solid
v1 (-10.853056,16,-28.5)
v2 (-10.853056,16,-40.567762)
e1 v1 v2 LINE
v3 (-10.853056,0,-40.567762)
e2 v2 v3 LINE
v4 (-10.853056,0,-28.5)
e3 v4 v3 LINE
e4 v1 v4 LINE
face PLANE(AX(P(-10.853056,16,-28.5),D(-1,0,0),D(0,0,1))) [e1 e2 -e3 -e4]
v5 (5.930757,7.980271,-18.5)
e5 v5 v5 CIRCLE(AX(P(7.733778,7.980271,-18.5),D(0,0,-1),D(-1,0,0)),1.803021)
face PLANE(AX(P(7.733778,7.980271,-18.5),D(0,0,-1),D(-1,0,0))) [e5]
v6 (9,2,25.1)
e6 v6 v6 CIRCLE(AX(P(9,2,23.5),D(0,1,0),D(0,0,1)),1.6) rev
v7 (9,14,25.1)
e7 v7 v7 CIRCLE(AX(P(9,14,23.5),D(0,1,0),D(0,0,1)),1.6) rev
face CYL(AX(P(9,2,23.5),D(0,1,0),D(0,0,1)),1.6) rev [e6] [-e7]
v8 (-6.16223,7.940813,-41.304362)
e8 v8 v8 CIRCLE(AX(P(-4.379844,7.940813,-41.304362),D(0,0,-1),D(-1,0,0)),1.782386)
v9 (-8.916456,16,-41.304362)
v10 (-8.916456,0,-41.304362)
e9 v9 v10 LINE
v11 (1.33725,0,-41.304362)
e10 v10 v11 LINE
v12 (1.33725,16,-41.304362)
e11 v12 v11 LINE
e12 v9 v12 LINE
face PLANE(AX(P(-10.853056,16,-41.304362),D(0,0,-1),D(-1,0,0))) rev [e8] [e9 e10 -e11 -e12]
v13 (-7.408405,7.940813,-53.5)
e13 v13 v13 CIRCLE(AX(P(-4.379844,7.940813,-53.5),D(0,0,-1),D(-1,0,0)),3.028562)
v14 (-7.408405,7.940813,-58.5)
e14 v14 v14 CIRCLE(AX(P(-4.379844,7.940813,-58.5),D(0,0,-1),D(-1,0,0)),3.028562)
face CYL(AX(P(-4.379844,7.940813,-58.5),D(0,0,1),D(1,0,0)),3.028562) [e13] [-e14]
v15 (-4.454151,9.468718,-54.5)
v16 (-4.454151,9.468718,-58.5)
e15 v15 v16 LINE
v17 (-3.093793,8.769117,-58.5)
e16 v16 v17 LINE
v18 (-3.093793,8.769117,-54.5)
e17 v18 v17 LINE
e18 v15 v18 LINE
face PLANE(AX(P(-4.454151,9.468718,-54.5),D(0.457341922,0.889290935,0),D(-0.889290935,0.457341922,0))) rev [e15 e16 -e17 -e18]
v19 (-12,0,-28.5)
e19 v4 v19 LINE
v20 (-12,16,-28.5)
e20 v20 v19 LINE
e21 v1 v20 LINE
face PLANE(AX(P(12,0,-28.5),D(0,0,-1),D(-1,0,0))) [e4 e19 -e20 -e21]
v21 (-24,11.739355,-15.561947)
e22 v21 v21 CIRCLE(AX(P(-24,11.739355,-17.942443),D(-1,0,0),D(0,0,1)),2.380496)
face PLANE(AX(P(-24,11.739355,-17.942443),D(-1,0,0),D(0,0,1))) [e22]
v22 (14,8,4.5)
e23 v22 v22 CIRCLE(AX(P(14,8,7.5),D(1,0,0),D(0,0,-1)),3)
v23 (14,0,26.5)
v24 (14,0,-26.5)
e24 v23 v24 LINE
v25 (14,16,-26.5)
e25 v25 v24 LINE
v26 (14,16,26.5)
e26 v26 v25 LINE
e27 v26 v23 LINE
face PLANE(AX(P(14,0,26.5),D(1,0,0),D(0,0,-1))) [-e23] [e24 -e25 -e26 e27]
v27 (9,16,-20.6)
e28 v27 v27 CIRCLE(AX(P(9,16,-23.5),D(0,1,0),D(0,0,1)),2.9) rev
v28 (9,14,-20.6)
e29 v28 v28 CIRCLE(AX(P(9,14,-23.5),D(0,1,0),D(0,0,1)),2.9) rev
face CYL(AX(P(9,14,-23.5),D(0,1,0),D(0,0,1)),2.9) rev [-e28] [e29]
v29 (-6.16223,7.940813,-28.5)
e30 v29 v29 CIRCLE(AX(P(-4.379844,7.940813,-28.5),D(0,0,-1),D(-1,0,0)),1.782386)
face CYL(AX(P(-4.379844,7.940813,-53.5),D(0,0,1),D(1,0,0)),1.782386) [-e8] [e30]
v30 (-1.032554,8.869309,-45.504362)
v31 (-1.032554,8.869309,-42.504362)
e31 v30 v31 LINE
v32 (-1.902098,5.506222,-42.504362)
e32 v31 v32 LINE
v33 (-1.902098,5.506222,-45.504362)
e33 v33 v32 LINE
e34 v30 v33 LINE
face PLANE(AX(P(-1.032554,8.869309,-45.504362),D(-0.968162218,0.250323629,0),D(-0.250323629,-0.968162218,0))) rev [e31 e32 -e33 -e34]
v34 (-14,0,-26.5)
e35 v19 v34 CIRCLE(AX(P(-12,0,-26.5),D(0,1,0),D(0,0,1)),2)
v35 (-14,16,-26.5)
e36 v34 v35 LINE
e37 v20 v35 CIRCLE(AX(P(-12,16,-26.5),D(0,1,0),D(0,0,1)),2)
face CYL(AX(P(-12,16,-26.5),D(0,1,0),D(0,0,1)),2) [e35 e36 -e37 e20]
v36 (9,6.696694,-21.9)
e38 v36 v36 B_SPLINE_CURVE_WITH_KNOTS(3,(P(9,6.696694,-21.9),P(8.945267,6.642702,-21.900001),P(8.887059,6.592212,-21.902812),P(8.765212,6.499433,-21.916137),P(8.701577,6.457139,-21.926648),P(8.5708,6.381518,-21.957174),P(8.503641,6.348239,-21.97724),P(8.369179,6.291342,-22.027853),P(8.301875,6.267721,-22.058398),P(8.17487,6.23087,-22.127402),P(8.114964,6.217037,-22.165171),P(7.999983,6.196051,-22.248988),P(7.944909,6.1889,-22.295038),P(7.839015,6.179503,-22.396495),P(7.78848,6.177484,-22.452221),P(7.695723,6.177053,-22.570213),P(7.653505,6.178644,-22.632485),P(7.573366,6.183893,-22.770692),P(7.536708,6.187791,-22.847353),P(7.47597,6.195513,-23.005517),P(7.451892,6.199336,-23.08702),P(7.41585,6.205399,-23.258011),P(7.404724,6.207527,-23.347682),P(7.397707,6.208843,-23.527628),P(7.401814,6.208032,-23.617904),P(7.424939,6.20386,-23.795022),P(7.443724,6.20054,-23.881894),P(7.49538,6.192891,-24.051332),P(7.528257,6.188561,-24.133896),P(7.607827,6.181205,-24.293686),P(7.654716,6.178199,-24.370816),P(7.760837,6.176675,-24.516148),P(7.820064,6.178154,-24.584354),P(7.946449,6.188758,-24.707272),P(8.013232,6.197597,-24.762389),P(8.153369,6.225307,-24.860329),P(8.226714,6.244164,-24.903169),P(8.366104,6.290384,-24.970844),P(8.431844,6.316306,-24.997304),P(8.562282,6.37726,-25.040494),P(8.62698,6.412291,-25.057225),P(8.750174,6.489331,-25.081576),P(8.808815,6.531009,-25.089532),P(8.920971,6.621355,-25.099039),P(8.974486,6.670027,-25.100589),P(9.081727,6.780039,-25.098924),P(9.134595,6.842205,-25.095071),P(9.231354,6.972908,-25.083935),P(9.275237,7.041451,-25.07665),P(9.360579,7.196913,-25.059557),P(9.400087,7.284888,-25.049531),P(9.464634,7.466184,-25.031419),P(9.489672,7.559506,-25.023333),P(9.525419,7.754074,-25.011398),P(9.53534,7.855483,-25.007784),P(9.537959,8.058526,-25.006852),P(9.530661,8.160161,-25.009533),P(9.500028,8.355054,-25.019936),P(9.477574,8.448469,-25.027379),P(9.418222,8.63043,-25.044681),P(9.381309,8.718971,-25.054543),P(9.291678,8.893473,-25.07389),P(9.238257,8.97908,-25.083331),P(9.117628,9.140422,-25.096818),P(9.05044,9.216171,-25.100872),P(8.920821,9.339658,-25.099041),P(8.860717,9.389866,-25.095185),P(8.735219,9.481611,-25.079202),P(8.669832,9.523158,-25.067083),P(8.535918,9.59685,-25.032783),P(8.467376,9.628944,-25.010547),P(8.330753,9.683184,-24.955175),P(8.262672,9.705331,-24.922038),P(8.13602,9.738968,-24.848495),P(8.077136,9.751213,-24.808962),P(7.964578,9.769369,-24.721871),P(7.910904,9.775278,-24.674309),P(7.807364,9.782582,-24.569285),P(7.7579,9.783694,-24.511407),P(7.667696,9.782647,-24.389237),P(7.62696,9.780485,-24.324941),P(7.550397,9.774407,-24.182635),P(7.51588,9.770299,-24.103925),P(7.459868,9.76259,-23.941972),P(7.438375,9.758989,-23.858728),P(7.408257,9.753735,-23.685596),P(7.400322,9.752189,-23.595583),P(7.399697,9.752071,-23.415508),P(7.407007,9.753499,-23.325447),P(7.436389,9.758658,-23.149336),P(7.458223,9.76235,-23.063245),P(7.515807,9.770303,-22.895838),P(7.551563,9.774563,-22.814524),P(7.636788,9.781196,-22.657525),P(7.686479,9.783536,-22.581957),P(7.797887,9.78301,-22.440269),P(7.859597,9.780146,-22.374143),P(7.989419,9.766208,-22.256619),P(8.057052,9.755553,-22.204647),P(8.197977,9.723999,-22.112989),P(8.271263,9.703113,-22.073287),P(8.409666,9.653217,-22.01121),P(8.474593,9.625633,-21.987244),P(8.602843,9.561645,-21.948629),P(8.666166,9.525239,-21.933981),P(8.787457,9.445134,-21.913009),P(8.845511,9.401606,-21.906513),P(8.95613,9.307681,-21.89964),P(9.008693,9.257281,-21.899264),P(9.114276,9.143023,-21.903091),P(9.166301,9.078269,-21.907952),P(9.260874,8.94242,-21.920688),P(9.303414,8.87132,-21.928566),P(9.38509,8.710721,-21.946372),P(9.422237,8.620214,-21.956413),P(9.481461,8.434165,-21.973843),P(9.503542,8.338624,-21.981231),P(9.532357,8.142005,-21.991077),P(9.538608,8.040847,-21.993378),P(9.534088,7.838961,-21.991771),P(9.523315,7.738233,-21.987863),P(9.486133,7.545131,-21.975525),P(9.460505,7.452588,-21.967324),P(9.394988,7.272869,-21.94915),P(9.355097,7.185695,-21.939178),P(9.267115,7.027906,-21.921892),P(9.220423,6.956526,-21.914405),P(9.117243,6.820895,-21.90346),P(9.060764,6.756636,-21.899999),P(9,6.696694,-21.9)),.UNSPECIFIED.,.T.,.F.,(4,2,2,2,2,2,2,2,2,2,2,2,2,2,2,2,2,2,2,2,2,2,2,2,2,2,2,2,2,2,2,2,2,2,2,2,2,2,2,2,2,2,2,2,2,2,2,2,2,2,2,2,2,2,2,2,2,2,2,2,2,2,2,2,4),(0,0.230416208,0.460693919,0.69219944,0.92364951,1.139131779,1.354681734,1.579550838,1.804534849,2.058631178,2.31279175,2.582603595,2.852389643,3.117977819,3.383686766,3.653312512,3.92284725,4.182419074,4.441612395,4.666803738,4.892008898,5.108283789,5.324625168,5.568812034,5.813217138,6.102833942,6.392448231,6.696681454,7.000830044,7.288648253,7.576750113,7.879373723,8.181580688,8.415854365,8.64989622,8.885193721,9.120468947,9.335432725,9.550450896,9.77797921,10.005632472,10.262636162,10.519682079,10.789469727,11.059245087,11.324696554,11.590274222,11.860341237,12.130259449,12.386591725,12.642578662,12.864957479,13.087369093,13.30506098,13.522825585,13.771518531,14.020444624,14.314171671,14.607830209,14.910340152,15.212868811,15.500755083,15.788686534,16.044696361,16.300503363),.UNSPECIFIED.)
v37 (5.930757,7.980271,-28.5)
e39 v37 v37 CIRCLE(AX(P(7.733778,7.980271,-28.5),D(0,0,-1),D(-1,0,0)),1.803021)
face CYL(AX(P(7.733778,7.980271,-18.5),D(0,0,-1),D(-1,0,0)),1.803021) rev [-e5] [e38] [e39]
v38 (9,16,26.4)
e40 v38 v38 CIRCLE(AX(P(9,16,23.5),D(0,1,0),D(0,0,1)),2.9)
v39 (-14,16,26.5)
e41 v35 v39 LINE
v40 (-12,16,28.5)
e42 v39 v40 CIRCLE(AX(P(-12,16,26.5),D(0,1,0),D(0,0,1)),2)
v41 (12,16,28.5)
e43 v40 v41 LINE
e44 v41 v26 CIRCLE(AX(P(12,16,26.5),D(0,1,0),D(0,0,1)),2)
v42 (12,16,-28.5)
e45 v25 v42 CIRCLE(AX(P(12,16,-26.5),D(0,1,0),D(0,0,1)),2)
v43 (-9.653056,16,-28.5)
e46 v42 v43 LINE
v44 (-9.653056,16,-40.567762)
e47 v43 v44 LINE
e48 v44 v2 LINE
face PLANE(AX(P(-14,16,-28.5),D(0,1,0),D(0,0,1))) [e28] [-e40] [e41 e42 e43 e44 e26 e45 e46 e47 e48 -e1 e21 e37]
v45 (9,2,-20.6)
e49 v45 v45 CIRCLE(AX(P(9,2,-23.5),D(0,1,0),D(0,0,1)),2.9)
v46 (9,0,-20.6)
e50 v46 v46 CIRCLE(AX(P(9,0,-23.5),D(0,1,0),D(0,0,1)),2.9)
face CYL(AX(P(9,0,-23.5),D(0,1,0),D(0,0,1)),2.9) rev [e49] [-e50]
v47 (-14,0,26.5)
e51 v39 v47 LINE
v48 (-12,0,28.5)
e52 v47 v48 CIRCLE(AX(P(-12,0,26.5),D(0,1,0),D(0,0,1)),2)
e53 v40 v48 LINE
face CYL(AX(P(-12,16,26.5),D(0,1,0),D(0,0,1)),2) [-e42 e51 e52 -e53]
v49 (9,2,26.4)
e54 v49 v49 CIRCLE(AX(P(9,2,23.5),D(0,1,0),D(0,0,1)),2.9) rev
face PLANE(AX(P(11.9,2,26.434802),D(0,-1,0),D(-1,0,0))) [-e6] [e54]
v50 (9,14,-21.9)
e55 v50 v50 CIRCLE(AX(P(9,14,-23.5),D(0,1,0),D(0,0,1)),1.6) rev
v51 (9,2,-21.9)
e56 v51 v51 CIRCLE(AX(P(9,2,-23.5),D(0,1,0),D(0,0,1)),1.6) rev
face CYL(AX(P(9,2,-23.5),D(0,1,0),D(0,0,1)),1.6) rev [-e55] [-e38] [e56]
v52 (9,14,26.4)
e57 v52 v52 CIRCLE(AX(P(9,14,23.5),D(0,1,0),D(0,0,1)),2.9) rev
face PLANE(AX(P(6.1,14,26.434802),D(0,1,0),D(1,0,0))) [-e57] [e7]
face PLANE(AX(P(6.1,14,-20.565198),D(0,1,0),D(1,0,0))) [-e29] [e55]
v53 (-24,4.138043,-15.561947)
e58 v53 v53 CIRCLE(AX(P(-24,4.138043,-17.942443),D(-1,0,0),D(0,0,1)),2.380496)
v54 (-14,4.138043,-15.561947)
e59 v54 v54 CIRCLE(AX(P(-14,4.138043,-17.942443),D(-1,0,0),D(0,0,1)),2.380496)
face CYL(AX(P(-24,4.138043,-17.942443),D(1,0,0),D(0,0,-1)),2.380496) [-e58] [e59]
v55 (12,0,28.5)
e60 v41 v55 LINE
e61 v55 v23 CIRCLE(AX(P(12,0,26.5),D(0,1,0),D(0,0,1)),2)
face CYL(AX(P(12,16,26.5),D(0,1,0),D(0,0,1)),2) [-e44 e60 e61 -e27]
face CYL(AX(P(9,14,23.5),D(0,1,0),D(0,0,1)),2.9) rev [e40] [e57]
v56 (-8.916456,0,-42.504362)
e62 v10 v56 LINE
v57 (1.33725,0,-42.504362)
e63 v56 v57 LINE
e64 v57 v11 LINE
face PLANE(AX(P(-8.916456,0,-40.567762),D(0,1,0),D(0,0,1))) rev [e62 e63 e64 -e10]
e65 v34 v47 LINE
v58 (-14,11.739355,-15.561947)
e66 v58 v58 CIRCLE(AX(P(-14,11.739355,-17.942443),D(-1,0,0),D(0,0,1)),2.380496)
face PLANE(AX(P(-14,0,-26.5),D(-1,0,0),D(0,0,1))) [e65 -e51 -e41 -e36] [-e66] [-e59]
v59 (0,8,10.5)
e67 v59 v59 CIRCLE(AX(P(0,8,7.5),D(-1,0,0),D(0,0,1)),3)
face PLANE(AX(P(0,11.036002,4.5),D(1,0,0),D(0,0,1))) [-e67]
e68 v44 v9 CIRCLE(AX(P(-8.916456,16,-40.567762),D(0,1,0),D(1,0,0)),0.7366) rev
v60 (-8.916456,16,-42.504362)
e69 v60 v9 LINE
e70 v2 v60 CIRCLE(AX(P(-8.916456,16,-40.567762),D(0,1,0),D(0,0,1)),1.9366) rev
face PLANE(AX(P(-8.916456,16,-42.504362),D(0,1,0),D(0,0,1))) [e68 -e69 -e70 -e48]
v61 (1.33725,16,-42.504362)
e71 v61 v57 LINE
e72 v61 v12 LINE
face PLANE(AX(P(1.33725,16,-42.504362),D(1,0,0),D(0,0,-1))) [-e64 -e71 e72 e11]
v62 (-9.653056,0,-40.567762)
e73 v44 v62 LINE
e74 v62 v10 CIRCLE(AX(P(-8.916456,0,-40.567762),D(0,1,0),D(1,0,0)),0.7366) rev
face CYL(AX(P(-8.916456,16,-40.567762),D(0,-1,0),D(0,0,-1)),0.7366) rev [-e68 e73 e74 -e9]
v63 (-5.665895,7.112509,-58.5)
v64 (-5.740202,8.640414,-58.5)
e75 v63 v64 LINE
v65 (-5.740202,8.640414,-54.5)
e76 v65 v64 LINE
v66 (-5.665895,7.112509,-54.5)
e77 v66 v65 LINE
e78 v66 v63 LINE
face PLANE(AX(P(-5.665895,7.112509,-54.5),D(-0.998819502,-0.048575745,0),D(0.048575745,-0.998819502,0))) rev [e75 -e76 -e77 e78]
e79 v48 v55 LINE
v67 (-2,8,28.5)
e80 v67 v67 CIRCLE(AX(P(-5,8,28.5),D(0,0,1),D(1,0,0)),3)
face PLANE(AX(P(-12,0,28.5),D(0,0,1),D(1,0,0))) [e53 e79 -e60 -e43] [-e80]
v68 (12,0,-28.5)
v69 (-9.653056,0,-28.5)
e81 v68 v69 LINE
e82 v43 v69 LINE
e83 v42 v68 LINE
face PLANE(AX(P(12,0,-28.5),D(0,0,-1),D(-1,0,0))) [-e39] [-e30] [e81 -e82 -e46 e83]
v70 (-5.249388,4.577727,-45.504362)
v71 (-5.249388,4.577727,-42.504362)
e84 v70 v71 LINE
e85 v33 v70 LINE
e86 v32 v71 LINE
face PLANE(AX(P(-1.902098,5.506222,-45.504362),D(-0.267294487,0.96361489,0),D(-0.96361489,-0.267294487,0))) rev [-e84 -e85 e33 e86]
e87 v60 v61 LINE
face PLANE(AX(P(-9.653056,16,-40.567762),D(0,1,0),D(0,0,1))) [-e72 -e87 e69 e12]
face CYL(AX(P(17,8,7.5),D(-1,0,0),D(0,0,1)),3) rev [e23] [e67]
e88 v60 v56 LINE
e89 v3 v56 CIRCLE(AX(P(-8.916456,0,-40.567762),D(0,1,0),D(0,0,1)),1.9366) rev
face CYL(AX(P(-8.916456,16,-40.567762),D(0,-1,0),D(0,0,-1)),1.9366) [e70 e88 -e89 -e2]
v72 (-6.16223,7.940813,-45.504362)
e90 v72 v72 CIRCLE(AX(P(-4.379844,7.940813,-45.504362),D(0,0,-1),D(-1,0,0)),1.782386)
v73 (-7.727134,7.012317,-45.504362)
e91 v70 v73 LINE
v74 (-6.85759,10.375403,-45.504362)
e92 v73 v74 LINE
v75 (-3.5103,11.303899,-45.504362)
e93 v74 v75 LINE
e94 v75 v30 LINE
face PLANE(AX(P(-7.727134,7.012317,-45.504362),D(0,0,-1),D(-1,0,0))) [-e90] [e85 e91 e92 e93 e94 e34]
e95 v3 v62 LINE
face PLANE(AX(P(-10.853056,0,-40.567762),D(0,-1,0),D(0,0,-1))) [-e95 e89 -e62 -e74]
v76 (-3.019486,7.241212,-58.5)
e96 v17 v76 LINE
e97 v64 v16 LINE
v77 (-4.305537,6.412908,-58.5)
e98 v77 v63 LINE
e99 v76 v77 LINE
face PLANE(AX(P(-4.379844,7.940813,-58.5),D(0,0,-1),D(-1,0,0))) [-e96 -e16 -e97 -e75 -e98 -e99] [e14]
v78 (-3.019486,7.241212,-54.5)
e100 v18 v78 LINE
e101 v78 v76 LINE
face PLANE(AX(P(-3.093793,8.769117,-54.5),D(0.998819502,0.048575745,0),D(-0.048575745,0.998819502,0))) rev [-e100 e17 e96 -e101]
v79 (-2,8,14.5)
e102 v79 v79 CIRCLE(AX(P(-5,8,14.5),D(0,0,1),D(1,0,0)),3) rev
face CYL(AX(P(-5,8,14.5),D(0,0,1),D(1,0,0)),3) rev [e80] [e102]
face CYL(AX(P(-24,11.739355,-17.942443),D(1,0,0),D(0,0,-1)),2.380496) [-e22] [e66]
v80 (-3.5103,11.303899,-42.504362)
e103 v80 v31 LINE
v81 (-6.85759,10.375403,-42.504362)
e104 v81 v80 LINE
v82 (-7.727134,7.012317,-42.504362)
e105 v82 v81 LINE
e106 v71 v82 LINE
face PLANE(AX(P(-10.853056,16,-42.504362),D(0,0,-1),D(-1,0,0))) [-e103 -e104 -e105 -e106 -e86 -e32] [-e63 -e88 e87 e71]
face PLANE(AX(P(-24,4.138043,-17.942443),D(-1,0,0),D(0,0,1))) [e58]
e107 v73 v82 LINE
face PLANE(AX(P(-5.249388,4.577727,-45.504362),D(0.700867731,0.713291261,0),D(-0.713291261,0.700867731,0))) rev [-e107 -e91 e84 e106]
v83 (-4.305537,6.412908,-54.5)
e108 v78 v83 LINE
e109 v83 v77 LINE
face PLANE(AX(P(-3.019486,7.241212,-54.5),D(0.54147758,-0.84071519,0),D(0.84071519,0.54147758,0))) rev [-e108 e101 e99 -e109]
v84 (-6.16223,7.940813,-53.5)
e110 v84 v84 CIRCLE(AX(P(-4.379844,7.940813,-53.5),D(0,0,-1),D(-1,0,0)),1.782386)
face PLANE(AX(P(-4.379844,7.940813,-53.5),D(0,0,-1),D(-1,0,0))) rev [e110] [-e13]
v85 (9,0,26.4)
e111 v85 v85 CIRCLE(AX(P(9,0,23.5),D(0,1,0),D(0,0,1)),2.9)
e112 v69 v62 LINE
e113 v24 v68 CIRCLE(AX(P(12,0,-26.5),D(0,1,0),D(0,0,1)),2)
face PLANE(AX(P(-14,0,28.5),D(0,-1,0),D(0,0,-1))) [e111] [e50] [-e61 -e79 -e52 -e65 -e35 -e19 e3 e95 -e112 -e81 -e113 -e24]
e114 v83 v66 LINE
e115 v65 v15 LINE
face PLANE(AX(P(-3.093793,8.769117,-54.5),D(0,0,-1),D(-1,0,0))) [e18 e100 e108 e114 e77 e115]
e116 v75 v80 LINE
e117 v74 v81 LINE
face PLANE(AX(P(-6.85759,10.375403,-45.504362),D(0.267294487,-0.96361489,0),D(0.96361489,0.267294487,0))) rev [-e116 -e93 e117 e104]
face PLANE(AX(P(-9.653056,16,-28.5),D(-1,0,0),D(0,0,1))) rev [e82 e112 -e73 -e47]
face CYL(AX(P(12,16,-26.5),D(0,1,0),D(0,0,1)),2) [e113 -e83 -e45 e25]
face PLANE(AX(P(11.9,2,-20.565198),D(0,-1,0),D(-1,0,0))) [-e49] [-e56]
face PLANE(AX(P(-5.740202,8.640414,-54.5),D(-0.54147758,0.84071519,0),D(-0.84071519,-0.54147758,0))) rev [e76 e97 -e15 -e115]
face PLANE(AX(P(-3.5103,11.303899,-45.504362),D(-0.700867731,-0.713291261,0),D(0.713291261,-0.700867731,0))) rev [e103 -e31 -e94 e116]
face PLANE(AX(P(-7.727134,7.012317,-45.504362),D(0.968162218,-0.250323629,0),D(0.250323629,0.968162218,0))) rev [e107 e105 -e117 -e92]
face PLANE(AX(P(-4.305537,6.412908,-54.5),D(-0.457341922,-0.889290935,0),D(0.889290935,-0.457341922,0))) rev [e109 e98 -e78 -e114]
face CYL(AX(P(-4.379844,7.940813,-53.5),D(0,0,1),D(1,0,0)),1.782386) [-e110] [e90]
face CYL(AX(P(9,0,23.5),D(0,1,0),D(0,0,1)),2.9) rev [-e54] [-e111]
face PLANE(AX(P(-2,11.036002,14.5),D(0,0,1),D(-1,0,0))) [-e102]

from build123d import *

# Parameters (mm, degrees)
CUT_EXTRUDE_START           = 11
CUT_EXTRUDE_1_OUTLINE_R     = 2.9
CUT_EXTRUDE_1_DEPTH         = 5
CUT_EXTRUDE_1_2_OUTLINE_R   = 2.9
CUT_EXTRUDE_1_2_DEPTH       = 4.9999999
CUT_EXTRUDE_START_2         = 2
CUT_EXTRUDE_1_3_OUTLINE_R   = 2.9
CUT_EXTRUDE_1_3_OUTLINE_R_2 = 1.6
CUT_EXTRUDE_1_3_DEPTH       = 12
CUT_EXTRUDE_START_3         = 4.9999999
CUT_EXTRUDE_1_4_OUTLINE_R   = 2.9
CUT_EXTRUDE_1_4_DEPTH       = 6.0000001
CUT_EXTRUDE_START_4         = 15.5
CUT_EXTRUDE_1_5_OUTLINE_R   = 5.75
CUT_EXTRUDE_1_5_OUTLINE_R_2 = 3
CUT_EXTRUDE_1_5_DEPTH       = 1.5
CUT_EXTRUDE_START_5         = 14
CUT_EXTRUDE_1_6_OUTLINE_R   = 4
CUT_EXTRUDE_1_6_OUTLINE_R_2 = 3
CUT_EXTRUDE_1_6_DEPTH       = 1.5
CUT_EXTRUDE_1_7_OUTLINE_R   = 3
CUT_EXTRUDE_1_7_DEPTH       = 14
CUT_EXTRUDE_START_6         = 14.5
CUT_EXTRUDE_1_8_OUTLINE_R   = 3
CUT_EXTRUDE_1_8_DEPTH       = 14
SKETCH_2_R                  = 6.172348418
CUT_EXTRUDE_2_DEPTH         = 3
SKETCH_3_R                  = 1.803021439
CUT_EXTRUDE_3_DEPTH         = 10
SM_BASE_FLANGE_1_DEPTH      = 16
SKETCH_7_R                  = 1.782386215
EXTRUDE_1_DEPTH             = 25
SKETCH_8_R                  = 3.028561668
EXTRUDE_2_DEPTH             = 5
CUT_EXTRUDE_4_DEPTH         = 4
EXTRUDE_3_DEPTH             = 3
SKETCH_11_R                 = 2.38049646
EXTRUDE_4_DEPTH             = 10


with BuildPart() as part:
    # 切除-拉伸1: read off the stored shape, not the designer's step
    # 切除-拉伸1 outline → 切除-拉伸1 (new body)
    with BuildSketch(Plane(origin=(0, 0, 0), x_dir=(1, 0, 0), z_dir=(0, 1, 0)).offset(CUT_EXTRUDE_START)):
        with BuildLine():
            ThreePointArc((-12, 28.5), (-13.414213562, 27.914213562), (-14, 26.5))
            Line((-14, 26.5), (-14, -26.5))
            ThreePointArc((-14, -26.5), (-13.414213562, -27.914213562), (-12, -28.5))
            Line((-12, -28.5), (12, -28.5))
            ThreePointArc((12, -28.5), (13.414213562, -27.914213562), (14, -26.5))
            Line((14, -26.5), (14, 26.5))
            ThreePointArc((14, 26.5), (13.414213562, 27.914213562), (12, 28.5))
            Line((12, 28.5), (-12, 28.5))
        make_face()
        with Locations((9, -23.5)):
            Circle(CUT_EXTRUDE_1_OUTLINE_R, mode=Mode.SUBTRACT)
        with Locations((9, 23.5)):
            Circle(CUT_EXTRUDE_1_OUTLINE_R, mode=Mode.SUBTRACT)
    extrude(amount=CUT_EXTRUDE_1_DEPTH)



with BuildPart() as body_2:
    # Cut-Extrude 1 2 outline → Cut-Extrude 1 2 (new body)
    with BuildSketch(Plane(origin=(0, 0, 0), x_dir=(1, 0, 0), z_dir=(0, 1, 0))):
        with BuildLine():
            ThreePointArc((-12, 28.5), (-13.414213562, 27.914213562), (-14, 26.5))
            Line((-14, 26.5), (-14, -26.5))
            ThreePointArc((-14, -26.5), (-13.414213562, -27.914213562), (-12, -28.5))
            Line((-12, -28.5), (12, -28.5))
            ThreePointArc((12, -28.5), (13.414213562, -27.914213562), (14, -26.5))
            Line((14, -26.5), (14, 26.5))
            ThreePointArc((14, 26.5), (13.414213562, 27.914213562), (12, 28.5))
            Line((12, 28.5), (-12, 28.5))
        make_face()
        with Locations((9, -23.5)):
            Circle(CUT_EXTRUDE_1_2_OUTLINE_R, mode=Mode.SUBTRACT)
        with Locations((9, 23.5)):
            Circle(CUT_EXTRUDE_1_2_OUTLINE_R, mode=Mode.SUBTRACT)
    extrude(amount=CUT_EXTRUDE_1_2_DEPTH)


with BuildPart() as part_1:
    add(part.part)

    add(body_2.part)  # Cut-Extrude 1 3 merges body 2
    # Cut-Extrude 1 3 outline → Cut-Extrude 1 3 (add)
    # profile 1 of 2: a face of its own
    with BuildSketch(Plane(origin=(0, 0, 0), x_dir=(1, 0, 0), z_dir=(0, 1, 0)).offset(CUT_EXTRUDE_START_2)):
        with Locations((9, 23.5)):
            Circle(CUT_EXTRUDE_1_3_OUTLINE_R)
        with Locations((9, 23.5)):
            Circle(CUT_EXTRUDE_1_3_OUTLINE_R_2, mode=Mode.SUBTRACT)
    # profile 2 of 2: a face of its own
    with BuildSketch(Plane(origin=(0, 0, 0), x_dir=(1, 0, 0), z_dir=(0, 1, 0)).offset(CUT_EXTRUDE_START_2)):
        with Locations((9, -23.5)):
            Circle(CUT_EXTRUDE_1_3_OUTLINE_R)
        with Locations((9, -23.5)):
            Circle(CUT_EXTRUDE_1_3_OUTLINE_R_2, mode=Mode.SUBTRACT)
    extrude(amount=CUT_EXTRUDE_1_3_DEPTH)

    # Cut-Extrude 1 4 outline → Cut-Extrude 1 4 (add)
    with BuildSketch(Plane(origin=(0, 0, 0), x_dir=(1, 0, 0), z_dir=(0, 1, 0)).offset(CUT_EXTRUDE_START_3)):
        with BuildLine():
            ThreePointArc((-12, 28.5), (-13.414213562, 27.914213562), (-14, 26.5))
            Line((-14, 26.5), (-14, -26.5))
            ThreePointArc((-14, -26.5), (-13.414213562, -27.914213562), (-12, -28.5))
            Line((-12, -28.5), (12, -28.5))
            ThreePointArc((12, -28.5), (13.414213562, -27.914213562), (14, -26.5))
            Line((14, -26.5), (14, 26.5))
            ThreePointArc((14, 26.5), (13.414213562, 27.914213562), (12, 28.5))
            Line((12, 28.5), (-12, 28.5))
        make_face()
        with Locations((9, -23.5)):
            Circle(CUT_EXTRUDE_1_4_OUTLINE_R, mode=Mode.SUBTRACT)
        with Locations((9, 23.5)):
            Circle(CUT_EXTRUDE_1_4_OUTLINE_R, mode=Mode.SUBTRACT)
    extrude(amount=CUT_EXTRUDE_1_4_DEPTH)



with BuildPart() as body_2_2:
    # Cut-Extrude 1 5 outline → Cut-Extrude 1 5 (new body)
    with BuildSketch(Plane.YZ.offset(CUT_EXTRUDE_START_4)):
        with Locations((8, 7.5)):
            Circle(CUT_EXTRUDE_1_5_OUTLINE_R)
        with Locations((8, 7.5)):
            Circle(CUT_EXTRUDE_1_5_OUTLINE_R_2, mode=Mode.SUBTRACT)
    extrude(amount=CUT_EXTRUDE_1_5_DEPTH)


with BuildPart() as part_2:
    add(part_1.part)

    add(body_2_2.part)  # Cut-Extrude 1 6 merges body 2 2
    # Cut-Extrude 1 6 outline → Cut-Extrude 1 6 (add)
    with BuildSketch(Plane.YZ.offset(CUT_EXTRUDE_START_5)):
        with Locations((8, 7.5)):
            Circle(CUT_EXTRUDE_1_6_OUTLINE_R)
        with Locations((8, 7.5)):
            Circle(CUT_EXTRUDE_1_6_OUTLINE_R_2, mode=Mode.SUBTRACT)
    extrude(amount=CUT_EXTRUDE_1_6_DEPTH)

    # Cut-Extrude 1 7 outline → Cut-Extrude 1 7 (cut)
    with BuildSketch(Plane.YZ):
        with Locations((8, 7.5)):
            Circle(CUT_EXTRUDE_1_7_OUTLINE_R)
    extrude(amount=CUT_EXTRUDE_1_7_DEPTH, mode=Mode.SUBTRACT)

    # Cut-Extrude 1 8 outline → Cut-Extrude 1 8 (cut)
    with BuildSketch(Plane.XY.offset(CUT_EXTRUDE_START_6)):
        with Locations((-5, 8)):
            Circle(CUT_EXTRUDE_1_8_OUTLINE_R)
    extrude(amount=CUT_EXTRUDE_1_8_DEPTH, mode=Mode.SUBTRACT)

    # 草图2 → 切除-拉伸2 (cut)
    with BuildSketch(Plane(origin=(17, 0, 0), x_dir=(0, 0, -1), z_dir=(1, 0, 0))):
        with Locations((-7.5, 8)):
            Circle(SKETCH_2_R)
    extrude(amount=-CUT_EXTRUDE_2_DEPTH, mode=Mode.SUBTRACT)

    # 草图3 → 切除-拉伸3 (cut)
    with BuildSketch(Plane(origin=(0, 0, -28.5), x_dir=(-1, 0, 0), z_dir=(0, 0, -1))):
        with Locations((-7.733778242, 7.980270974)):
            Circle(SKETCH_3_R)
    extrude(amount=-CUT_EXTRUDE_3_DEPTH, mode=Mode.SUBTRACT)



with BuildPart() as body_2_3:
    # 基体-法兰1: sheet metal written as solids
    # 草图4 → 基体-法兰1 (new body)
    with BuildSketch(Plane(origin=(0, 0, 0), x_dir=(1, 0, 0), z_dir=(0, 1, 0))):
        with BuildLine():
            Line((-10.853055632, 28.5), (-10.853055632, 40.567762067))
            ThreePointArc((-10.853055632, 40.567762067), (-10.285838624, 41.937145059), (-8.916455632, 42.504362067))
            Line((-8.916455632, 42.504362067), (1.33725023, 42.504362067))
            Line((1.33725023, 42.504362067), (1.33725023, 41.304362067))
            Line((1.33725023, 41.304362067), (-8.916455632, 41.304362067))
            ThreePointArc((-8.916455632, 41.304362067), (-9.437310487, 41.088616922), (-9.653055632, 40.567762067))
            Line((-9.653055632, 40.567762067), (-9.653055632, 28.5))
            Line((-9.653055632, 28.5), (-10.853055632, 28.5))
        make_face()
    extrude(amount=SM_BASE_FLANGE_1_DEPTH)


with BuildPart() as part_3:
    add(part_2.part)

    add(body_2_3.part)  # 凸台-拉伸1 merges body 2 3
    # 草图7 → 凸台-拉伸1 (add)
    with BuildSketch(Plane(origin=(0, 0, -28.5), x_dir=(-1, 0, 0), z_dir=(0, 0, -1))):
        with Locations((4.3798438, 7.940812922)):
            Circle(SKETCH_7_R)
    extrude(amount=EXTRUDE_1_DEPTH)

    # 草图8 → 凸台-拉伸2 (add)
    with BuildSketch(Plane(origin=(0, 0, -53.5), x_dir=(-1, 0, 0), z_dir=(0, 0, -1))):
        with Locations((4.3798438, 7.940812922)):
            Circle(SKETCH_8_R)
    extrude(amount=EXTRUDE_2_DEPTH)

    # 草图9 → 切除-拉伸4 (cut)
    with BuildSketch(Plane(origin=(0, 0, -58.5), x_dir=(-1, 0, 0), z_dir=(0, 0, -1))):
        Polygon((3.093792683, 8.769117031), (3.01948584, 7.241212038), (4.305536958, 6.412907929), (5.665894918, 7.112508812), (5.74020176, 8.640413805), (4.454150642, 9.468717915), align=None)
    extrude(amount=-CUT_EXTRUDE_4_DEPTH, mode=Mode.SUBTRACT)

    # 草图10 → 凸台-拉伸3 (add)
    with BuildSketch(Plane(origin=(0, 0, -42.504362067), x_dir=(-1, 0, 0), z_dir=(0, 0, -1))):
        Polygon((7.727133917, 7.012317312), (6.857589643, 10.375403392), (3.510299527, 11.303899001), (1.032553683, 8.869308531), (1.902097957, 5.506222451), (5.249388073, 4.577726842), align=None)
    extrude(amount=EXTRUDE_3_DEPTH)

    # 草图11 → 凸台-拉伸4 (add)
    with BuildSketch(Plane.ZY.offset(14)):
        with Locations((-17.942443325, 11.739355059)):
            Circle(SKETCH_11_R)
        with Locations((-17.942443325, 4.138043136)):
            Circle(SKETCH_11_R)
    extrude(amount=EXTRUDE_4_DEPTH)


solid = part_3.part
